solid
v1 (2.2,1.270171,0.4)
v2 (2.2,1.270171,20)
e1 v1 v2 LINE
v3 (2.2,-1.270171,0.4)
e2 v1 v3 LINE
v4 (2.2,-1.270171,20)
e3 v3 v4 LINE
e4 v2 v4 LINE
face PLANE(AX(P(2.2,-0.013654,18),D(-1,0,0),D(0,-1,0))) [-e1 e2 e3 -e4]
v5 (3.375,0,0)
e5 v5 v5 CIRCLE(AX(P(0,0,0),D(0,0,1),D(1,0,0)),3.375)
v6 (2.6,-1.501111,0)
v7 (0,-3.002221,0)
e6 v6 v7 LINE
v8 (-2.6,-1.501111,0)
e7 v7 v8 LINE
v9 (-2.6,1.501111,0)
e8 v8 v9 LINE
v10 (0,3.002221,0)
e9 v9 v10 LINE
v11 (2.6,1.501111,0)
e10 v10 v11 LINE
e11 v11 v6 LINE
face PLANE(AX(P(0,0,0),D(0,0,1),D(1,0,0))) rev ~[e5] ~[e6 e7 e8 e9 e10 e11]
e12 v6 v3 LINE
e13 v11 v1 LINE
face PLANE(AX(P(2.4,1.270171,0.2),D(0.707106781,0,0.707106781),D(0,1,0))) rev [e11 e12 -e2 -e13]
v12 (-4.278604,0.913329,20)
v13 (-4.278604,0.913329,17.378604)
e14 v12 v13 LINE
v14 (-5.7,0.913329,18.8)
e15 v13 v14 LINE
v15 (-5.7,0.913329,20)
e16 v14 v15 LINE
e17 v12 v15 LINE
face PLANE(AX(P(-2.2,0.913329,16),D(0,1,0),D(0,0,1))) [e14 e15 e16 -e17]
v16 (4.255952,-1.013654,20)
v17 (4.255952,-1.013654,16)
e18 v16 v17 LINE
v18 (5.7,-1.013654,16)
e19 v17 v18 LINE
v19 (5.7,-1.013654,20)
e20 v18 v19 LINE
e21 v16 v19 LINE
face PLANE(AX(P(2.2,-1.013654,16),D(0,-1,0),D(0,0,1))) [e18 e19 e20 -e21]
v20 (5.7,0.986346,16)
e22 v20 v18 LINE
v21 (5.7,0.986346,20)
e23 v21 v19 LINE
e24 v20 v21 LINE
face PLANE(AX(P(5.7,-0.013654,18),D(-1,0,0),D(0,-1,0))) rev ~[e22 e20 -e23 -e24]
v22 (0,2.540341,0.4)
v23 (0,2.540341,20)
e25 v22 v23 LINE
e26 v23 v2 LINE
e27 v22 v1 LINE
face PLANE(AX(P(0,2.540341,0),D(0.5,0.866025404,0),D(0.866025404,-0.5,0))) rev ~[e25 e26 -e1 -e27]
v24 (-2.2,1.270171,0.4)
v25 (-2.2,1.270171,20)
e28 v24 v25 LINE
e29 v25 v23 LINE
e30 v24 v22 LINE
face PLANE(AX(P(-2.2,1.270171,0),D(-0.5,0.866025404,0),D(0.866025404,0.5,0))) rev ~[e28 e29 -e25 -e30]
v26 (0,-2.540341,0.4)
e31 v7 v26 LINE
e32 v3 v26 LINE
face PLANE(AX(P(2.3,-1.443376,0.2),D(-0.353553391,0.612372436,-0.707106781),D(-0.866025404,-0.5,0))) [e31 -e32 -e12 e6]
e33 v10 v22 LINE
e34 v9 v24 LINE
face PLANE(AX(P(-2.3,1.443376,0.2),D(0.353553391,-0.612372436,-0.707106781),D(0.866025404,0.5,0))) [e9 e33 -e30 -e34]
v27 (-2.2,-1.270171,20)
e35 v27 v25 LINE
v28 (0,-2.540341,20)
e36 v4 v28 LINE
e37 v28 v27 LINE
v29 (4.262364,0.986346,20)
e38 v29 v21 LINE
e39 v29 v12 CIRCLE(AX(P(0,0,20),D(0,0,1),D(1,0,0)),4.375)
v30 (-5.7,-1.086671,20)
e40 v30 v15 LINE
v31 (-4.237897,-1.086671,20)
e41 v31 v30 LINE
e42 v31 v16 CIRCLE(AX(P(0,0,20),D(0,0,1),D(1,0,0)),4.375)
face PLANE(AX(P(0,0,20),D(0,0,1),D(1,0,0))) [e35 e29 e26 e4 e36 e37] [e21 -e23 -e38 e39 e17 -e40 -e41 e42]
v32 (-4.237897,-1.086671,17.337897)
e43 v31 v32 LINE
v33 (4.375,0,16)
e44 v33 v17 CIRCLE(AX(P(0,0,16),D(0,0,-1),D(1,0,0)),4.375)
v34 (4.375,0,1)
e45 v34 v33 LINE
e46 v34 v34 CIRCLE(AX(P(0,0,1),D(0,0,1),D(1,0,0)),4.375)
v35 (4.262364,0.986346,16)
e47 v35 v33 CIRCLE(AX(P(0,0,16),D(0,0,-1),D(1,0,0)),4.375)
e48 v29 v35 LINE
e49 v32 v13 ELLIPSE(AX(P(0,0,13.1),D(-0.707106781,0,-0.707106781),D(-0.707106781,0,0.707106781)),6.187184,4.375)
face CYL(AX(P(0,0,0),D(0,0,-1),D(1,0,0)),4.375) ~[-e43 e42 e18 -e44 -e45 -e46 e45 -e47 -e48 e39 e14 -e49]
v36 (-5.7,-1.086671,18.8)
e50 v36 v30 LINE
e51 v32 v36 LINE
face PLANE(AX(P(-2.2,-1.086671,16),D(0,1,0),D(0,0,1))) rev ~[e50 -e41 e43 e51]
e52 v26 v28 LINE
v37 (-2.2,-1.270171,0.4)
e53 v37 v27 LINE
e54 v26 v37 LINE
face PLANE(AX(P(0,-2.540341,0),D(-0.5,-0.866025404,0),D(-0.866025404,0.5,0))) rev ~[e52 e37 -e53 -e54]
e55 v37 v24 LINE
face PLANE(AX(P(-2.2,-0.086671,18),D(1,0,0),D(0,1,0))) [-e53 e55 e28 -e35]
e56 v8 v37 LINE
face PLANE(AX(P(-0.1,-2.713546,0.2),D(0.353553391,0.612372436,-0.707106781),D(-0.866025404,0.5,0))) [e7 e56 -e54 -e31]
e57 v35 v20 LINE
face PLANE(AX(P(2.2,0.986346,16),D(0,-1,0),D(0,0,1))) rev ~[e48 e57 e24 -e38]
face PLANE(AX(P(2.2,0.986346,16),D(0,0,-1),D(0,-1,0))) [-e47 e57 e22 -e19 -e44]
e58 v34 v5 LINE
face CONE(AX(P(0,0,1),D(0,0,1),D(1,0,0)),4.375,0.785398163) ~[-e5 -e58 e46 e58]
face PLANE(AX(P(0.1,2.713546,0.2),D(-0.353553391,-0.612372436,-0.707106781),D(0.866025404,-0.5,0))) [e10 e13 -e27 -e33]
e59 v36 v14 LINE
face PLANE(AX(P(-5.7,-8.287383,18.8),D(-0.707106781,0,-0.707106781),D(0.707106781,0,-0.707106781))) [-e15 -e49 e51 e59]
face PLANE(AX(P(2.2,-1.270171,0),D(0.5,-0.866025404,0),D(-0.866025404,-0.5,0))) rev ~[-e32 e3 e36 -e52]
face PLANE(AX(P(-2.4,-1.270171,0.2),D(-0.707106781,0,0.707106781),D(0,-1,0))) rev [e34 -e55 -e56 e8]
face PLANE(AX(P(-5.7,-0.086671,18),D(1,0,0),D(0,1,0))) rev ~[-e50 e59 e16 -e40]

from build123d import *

# Parameters (mm, degrees)
F0_R        = 4.375
F1_DEPTH    = 20
F2_W        = 2
F2_H        = 4
F3_DEPTH    = 3.5
F4_W        = 2
F4_H        = 4
F5_DEPTH    = 3.5
F6_T4_DEPTH = 16.4014247326
F6_S5_R     = 4.375
F6_T6_DEPTH = 10
F7_SIZE     = 1
F8_SIZE     = 0.4


# Not quite as in the source:
# - a fillet or chamfer that OpenCascade refuses, or shapes differently, is made with other operations: its cross-section is extruded or revolved along the edge and cut away or added


with BuildPart() as f1:
    # F0 (on Top) → F1 (new body)
    with BuildSketch(Plane.XY):
        Circle(F0_R)
        Polygon((-2.2, -1.2701705922), (-2.2, 1.2701705922), (0, 2.5403411844), (2.2, 1.2701705922), (2.2, -1.2701705922), (0, -2.5403411844), align=None, mode=Mode.SUBTRACT)
    extrude(amount=F1_DEPTH)

    # F2 (on face) → F3 (join)
    with BuildSketch(Plane.YZ.offset(-2.2)):
        with Locations((-0.0866705922, 18)):
            Rectangle(F2_W, F2_H)
    extrude(amount=-F3_DEPTH)

    # F4 (on face) → F5 (join)
    with BuildSketch(Plane(origin=(2.2, 0, 0), x_dir=(0, -1, 0), z_dir=(-1, 0, 0))):
        with Locations((0.0136538511, 18)):
            Rectangle(F4_W, F4_H)
    extrude(amount=-F5_DEPTH)

    # F6: chamfer of 2.8 on 1 edges, made by hand


with BuildPart() as f6_tool2:
    # F6_s3 → F6_t4 (new body)
    with BuildSketch(Plane.XZ.offset(8.2873829585)):
        Polygon((-5.7, 18.8), (-2.9, 16), (-5.7, 16), align=None)
    extrude(amount=-F6_T4_DEPTH)

    # F6_s5 → F6_t6 (cut, symmetric)
    with BuildSketch(Plane.XY.offset(17.4)):
        Circle(F6_S5_R)
    extrude(amount=F6_T6_DEPTH, both=True, mode=Mode.SUBTRACT)


with BuildPart() as f1_1:
    add(f1.part)

    # F6_t1: cut F6_tool2
    add(f6_tool2.part, mode=Mode.SUBTRACT)

    # F7
    f7_edges = [f1_1.edges().sort_by_distance(p)[0] for p in [
        (-4.375, 0, 0),
    ]]
    chamfer(f7_edges, length=F7_SIZE)

    # F8
    f8_edges = [f1_1.edges().sort_by_distance(p)[0] for p in [
        (2.2, 0, 0),
        (1.1, -1.905256, 0),
        (-1.1, -1.905256, 0),
        (-2.2, 0, 0),
        (-1.1, 1.905256, 0),
        (1.1, 1.905256, 0),
    ]]
    chamfer(f8_edges, length=F8_SIZE)


solid = f1_1.part
